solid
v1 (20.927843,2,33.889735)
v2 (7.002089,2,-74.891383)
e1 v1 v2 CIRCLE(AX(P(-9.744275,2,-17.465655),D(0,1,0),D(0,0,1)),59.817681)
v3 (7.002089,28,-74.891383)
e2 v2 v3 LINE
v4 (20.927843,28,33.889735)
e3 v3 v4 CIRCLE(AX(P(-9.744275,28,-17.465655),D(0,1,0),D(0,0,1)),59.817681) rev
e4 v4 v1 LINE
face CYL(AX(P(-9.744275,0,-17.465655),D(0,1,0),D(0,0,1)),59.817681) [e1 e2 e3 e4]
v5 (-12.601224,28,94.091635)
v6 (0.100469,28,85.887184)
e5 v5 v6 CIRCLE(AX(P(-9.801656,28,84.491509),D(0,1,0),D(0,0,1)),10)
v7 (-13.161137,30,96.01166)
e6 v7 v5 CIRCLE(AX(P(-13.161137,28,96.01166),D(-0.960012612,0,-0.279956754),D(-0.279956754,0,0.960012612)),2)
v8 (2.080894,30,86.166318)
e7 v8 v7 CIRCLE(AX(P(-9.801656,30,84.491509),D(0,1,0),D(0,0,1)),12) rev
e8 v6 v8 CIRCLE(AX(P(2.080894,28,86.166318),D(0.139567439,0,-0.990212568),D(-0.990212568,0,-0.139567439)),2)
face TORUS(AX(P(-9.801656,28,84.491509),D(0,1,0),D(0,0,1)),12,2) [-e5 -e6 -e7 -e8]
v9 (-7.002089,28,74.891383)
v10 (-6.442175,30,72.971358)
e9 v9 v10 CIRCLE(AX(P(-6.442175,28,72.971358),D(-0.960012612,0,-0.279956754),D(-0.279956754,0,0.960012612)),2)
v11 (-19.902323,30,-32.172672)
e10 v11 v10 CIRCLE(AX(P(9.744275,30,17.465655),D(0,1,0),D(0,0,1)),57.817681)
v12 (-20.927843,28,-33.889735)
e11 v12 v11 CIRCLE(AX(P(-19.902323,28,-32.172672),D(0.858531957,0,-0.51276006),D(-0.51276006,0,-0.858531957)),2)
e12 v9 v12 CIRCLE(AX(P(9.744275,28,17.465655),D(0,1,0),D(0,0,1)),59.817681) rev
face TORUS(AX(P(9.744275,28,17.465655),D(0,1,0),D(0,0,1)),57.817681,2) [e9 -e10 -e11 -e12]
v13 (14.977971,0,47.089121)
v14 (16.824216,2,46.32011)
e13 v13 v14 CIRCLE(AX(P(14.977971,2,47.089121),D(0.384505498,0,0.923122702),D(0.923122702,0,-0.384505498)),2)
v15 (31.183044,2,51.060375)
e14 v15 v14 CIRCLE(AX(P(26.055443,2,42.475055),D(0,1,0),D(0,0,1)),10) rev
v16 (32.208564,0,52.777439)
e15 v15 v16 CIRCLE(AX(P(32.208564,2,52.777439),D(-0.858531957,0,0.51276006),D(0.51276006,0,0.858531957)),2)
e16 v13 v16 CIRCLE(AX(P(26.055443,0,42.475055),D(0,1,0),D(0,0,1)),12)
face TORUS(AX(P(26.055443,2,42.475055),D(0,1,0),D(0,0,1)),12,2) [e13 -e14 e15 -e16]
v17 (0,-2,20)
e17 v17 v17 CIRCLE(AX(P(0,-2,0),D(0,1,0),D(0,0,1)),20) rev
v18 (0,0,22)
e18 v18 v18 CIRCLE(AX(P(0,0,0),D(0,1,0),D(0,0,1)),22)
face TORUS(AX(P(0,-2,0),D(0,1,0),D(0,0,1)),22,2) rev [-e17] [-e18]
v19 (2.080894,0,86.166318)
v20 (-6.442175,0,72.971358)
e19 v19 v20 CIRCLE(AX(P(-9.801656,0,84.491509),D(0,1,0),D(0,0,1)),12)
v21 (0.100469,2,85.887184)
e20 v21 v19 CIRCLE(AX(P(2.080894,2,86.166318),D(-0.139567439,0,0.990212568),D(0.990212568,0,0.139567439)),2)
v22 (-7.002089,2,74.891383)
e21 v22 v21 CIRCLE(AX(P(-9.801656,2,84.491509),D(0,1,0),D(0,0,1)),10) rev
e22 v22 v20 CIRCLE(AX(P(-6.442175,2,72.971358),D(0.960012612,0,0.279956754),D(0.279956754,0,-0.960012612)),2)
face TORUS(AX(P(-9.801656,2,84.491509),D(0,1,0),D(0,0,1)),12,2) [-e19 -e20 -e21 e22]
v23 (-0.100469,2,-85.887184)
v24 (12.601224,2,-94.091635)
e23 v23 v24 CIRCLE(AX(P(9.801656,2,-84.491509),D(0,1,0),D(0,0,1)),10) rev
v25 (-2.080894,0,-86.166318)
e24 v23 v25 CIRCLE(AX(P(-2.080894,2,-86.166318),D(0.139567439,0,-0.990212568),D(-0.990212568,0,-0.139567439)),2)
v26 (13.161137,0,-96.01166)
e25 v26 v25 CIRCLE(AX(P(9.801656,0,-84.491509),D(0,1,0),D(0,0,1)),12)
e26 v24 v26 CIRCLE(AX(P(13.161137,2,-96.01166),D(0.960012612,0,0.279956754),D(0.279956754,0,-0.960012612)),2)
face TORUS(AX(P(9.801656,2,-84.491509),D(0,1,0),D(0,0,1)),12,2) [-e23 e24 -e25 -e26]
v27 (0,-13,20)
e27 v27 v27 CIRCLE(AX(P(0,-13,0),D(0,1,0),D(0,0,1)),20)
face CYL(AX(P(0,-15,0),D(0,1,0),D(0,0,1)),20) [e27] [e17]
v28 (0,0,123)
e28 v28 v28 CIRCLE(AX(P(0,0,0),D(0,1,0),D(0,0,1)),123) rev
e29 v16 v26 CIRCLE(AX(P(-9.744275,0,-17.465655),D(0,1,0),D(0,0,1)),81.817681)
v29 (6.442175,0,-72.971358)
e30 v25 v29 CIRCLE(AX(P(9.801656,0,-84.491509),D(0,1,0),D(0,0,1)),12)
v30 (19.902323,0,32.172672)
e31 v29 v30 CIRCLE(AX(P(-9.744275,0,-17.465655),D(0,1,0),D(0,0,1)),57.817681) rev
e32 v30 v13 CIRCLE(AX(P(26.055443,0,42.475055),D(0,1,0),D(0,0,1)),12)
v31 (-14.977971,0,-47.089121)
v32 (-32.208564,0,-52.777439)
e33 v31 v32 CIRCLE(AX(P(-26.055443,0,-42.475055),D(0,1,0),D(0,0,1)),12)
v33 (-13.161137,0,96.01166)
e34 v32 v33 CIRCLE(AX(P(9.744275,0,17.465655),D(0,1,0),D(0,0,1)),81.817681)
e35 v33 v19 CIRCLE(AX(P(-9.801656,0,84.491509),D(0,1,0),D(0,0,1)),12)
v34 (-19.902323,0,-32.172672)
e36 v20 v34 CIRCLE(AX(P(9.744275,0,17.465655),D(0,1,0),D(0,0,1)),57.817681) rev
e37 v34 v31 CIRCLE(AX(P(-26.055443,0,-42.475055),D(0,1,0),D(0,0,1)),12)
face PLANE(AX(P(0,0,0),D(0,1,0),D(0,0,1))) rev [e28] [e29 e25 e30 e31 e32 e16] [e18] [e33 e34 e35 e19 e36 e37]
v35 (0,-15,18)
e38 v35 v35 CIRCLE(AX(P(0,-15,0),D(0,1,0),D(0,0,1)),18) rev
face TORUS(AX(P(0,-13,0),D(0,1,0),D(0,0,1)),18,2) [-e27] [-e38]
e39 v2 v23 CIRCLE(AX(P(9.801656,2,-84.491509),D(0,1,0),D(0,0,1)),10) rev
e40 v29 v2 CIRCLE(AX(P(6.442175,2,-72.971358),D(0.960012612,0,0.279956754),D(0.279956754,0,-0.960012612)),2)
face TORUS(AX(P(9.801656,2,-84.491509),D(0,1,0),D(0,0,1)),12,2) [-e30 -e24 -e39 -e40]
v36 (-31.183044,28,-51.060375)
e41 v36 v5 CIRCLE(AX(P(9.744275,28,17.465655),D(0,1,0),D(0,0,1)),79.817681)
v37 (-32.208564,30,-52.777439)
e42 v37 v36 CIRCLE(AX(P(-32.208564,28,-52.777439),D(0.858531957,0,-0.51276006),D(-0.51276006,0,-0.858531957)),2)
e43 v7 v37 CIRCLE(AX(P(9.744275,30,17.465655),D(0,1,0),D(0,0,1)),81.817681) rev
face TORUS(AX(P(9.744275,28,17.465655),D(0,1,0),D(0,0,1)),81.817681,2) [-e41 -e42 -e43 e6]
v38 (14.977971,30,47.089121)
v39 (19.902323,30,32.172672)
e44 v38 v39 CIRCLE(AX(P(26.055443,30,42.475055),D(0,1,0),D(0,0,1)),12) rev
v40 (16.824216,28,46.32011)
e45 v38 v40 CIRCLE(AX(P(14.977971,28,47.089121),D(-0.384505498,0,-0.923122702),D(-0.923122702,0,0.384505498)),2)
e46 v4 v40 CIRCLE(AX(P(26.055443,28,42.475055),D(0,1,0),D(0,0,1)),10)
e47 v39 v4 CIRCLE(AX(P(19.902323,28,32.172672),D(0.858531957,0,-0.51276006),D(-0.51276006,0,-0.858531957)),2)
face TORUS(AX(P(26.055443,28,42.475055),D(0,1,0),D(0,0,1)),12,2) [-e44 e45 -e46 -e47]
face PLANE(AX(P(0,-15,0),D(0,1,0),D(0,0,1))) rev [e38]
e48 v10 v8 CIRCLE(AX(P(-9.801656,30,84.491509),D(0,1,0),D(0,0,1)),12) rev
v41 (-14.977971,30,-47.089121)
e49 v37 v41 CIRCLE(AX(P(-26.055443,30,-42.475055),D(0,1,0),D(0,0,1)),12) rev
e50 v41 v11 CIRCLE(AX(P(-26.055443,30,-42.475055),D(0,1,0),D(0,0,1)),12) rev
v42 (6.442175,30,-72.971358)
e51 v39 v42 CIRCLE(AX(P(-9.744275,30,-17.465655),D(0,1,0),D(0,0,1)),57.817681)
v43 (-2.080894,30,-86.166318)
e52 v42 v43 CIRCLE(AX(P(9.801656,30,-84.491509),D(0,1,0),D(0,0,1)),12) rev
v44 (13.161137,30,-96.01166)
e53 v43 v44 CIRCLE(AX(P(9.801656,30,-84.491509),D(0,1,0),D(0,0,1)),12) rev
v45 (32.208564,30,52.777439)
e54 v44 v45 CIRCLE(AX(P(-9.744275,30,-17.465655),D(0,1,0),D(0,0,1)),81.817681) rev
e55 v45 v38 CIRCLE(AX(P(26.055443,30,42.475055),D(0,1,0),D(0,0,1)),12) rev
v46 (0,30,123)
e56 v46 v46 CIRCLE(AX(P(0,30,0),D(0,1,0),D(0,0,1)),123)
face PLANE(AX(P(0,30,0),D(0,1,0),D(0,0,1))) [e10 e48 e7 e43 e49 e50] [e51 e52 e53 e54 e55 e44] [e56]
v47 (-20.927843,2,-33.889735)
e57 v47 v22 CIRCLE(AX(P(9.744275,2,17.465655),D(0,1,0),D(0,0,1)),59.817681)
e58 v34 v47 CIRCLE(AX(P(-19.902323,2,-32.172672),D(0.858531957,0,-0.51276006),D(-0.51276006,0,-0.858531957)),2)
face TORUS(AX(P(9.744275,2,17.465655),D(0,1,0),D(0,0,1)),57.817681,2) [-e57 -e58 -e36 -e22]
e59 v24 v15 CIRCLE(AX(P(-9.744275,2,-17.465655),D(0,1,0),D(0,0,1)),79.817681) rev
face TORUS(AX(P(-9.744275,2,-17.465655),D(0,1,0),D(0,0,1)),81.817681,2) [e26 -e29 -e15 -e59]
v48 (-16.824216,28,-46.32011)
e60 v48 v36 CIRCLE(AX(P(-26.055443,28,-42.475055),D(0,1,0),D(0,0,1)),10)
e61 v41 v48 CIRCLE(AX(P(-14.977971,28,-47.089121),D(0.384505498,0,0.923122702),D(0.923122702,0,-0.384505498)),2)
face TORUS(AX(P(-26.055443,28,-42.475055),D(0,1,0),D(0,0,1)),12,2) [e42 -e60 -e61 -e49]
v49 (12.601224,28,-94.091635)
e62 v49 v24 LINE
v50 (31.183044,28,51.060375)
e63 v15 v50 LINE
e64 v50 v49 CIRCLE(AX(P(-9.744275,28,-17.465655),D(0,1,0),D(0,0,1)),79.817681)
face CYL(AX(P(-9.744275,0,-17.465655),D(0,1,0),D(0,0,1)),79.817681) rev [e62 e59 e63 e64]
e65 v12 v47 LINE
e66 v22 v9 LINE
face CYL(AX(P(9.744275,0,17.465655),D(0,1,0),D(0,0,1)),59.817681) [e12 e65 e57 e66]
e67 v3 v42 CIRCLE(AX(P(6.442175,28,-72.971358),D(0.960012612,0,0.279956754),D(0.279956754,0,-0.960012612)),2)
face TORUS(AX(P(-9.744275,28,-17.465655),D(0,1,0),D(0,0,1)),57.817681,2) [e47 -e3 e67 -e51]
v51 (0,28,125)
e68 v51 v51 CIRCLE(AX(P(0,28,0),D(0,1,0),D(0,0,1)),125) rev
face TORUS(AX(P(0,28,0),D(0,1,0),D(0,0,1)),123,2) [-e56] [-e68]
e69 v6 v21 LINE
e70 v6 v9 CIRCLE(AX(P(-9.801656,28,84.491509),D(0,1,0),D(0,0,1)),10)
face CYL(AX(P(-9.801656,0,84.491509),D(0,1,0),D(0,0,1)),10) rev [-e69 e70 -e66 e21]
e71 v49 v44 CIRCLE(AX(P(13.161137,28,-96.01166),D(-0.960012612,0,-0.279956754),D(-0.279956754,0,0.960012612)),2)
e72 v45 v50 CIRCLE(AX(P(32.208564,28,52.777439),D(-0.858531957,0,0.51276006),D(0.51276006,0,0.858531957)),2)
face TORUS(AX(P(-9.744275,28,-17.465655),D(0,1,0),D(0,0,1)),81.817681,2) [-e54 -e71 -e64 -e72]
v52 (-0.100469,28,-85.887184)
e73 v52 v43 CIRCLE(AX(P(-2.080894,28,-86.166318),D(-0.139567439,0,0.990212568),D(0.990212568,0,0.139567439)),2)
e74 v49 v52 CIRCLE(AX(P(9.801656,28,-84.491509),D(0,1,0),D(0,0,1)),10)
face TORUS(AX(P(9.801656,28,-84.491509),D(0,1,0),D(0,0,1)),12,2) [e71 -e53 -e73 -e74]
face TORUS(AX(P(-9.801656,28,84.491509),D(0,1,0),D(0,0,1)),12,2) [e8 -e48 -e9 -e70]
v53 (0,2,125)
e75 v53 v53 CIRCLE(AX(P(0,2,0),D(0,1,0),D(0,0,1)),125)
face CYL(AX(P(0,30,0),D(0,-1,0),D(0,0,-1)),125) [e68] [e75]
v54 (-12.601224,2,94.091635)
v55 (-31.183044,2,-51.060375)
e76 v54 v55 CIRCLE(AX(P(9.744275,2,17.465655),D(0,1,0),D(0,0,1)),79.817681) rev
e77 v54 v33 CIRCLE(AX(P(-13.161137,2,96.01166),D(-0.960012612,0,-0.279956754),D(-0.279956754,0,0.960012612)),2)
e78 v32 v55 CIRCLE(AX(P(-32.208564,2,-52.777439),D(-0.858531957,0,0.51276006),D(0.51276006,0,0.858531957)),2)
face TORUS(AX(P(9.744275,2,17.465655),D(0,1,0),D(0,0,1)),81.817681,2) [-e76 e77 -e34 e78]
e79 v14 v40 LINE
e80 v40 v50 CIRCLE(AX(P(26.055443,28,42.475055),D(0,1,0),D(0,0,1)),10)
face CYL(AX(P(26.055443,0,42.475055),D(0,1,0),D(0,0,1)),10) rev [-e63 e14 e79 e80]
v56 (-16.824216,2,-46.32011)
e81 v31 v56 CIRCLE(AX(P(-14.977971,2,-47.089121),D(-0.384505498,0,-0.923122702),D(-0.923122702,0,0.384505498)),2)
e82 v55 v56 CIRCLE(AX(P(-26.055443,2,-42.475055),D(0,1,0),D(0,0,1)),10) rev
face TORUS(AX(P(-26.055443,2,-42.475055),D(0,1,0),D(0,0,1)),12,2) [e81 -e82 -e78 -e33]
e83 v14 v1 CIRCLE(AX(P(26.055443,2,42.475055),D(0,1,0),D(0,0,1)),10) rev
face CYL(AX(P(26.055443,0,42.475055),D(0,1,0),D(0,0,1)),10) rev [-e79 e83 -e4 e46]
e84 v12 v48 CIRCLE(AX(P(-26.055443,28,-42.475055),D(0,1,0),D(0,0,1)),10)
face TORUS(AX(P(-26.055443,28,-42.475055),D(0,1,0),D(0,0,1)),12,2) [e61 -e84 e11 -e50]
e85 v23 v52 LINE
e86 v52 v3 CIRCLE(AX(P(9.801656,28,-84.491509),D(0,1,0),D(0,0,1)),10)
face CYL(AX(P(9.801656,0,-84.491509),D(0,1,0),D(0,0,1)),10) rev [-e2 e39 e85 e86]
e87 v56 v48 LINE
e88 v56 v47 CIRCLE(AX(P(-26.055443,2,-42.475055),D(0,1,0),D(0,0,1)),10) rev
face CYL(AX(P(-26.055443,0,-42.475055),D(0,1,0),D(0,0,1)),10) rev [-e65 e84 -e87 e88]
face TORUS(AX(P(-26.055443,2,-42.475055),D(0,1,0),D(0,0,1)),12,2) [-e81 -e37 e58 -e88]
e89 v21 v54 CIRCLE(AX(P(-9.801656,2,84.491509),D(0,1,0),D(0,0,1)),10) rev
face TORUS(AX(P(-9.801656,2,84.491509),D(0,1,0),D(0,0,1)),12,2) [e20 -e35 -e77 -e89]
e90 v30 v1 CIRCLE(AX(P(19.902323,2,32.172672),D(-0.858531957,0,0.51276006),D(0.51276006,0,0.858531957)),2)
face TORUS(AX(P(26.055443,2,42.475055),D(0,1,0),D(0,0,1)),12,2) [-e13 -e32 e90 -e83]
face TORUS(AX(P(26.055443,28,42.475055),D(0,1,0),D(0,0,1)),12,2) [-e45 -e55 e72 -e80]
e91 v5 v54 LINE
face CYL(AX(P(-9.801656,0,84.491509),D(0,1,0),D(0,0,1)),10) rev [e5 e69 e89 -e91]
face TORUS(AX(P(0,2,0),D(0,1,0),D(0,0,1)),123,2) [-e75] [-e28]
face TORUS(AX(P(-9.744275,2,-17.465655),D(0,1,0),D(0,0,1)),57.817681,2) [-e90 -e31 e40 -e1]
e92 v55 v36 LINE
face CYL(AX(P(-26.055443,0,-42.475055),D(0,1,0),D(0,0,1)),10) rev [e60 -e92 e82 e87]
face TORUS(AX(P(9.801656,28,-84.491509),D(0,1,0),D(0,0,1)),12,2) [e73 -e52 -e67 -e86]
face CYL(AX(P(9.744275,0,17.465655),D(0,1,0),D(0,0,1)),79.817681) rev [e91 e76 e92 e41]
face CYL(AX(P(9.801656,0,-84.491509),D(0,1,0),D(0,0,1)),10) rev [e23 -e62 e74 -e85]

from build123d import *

# Parameters (mm, degrees)
SKETCH_1_R          = 125
SKETCH_1_R_2        = 20
EXTRUDE_1_DEPTH     = 30
CUT_EXTRUDE_1_DEPTH = 30
FILLET_3_R          = 10
SKETCH_1_3_R        = 20
EXTRUDE_2_DEPTH     = 30
FILLET_4_R          = 2
SKETCH_1_4_R        = 20
EXTRUDE_3_DEPTH     = 15
FILLET_5_R          = 2


with BuildPart() as part:
    # 草图1 → 凸台-拉伸1 (new body)
    with BuildSketch(Plane(origin=(0, 0, 0), x_dir=(1, 0, 0), z_dir=(0, 1, 0))):
        with Locations(Location((0, 0, 0), (0, 0, 270))):
            Circle(SKETCH_1_R)
        with Locations(Location((0, 0, 0), (0, 0, 270))):
            Circle(SKETCH_1_R_2, mode=Mode.SUBTRACT)
    extrude(amount=EXTRUDE_1_DEPTH)

    # 草图2 → 切除-拉伸1 (cut)
    with BuildSketch(Plane(origin=(0, 30, 0), x_dir=(1, 0, 0), z_dir=(0, 1, 0))):
        with BuildLine():
            Line((1.395674395, 96.50212568), (-1.395674395, 76.69787432))
            ThreePointArc((-1.395674395, 76.69787432), (49.589198145, 25.061305382), (13.255952188, -37.753404024))
            Line((13.255952188, -37.753404024), (20.946062145, -56.215858055))
            ThreePointArc((20.946062145, -56.215858055), (69.427303642, 27.600905796), (1.395674395, 96.50212568))
        make_face()
        with BuildLine():
            Line((-13.255952188, 37.753404024), (-20.946062145, 56.215858055))
            ThreePointArc((-20.946062145, 56.215858055), (-69.427303642, -27.600905796), (-1.395674395, -96.50212568))
            Line((-1.395674395, -96.50212568), (1.395674395, -76.69787432))
            ThreePointArc((1.395674395, -76.69787432), (-49.589198145, -25.061305382), (-13.255952188, 37.753404024))
        make_face()
    extrude(amount=-CUT_EXTRUDE_1_DEPTH, mode=Mode.SUBTRACT)

    # 圆角3
    fillet_3_edges = [part.edges().sort_by_distance(p)[0] for p in [
        (-20.946062145, 15, -56.215858055),
        (-13.255952188, 15, -37.753404024),
        (-1.395674395, 15, 96.50212568),
        (1.395674395, 15, 76.69787432),
        (20.946062145, 15, 56.215858055),
        (13.255952188, 15, 37.753404024),
        (-1.395674395, 15, -76.69787432),
        (1.395674395, 15, -96.50212568),
    ]]
    fillet(fillet_3_edges, radius=FILLET_3_R - 0.0001)  # a hair under: the kernel refuses the full size

    # 草图1<3> → 凸台-拉伸2 (add)
    with BuildSketch(Plane(origin=(0, 0, 0), x_dir=(1, 0, 0), z_dir=(0, 1, 0))):
        Circle(SKETCH_1_3_R)
    extrude(amount=EXTRUDE_2_DEPTH)

    # 圆角4
    fillet_4_edges = [part.edges().sort_by_distance(p)[0] for p in [
        (0, 0, -125),
        (-69.427303642, 30, 27.600905796),
        (-69.427303642, 0, 27.600905796),
        (-49.589198145, 30, 25.061305382),
        (-49.589198145, 0, 25.061305382),
        (69.427303642, 30, -27.600905796),
        (69.427303642, 0, -27.600905796),
        (49.589198145, 30, -25.061305382),
        (49.589198145, 0, -25.061305382),
        (0, 30, -125),
        (-22.920540142, 30, -51.971024611),
        (-22.920540142, 0, -51.971024611),
        (-16.559492515, 30, -39.340160323),
        (-16.559492515, 0, -39.340160323),
        (-4.375771536, 30, 92.891558501),
        (-4.375771536, 0, 92.891558501),
        (-1.401623113, 30, 79.065637167),
        (-1.401623113, 0, 79.065637167),
        (22.920540142, 30, 51.971024611),
        (22.920540142, 0, 51.971024611),
        (16.559492515, 30, 39.340160323),
        (16.559492515, 0, 39.340160323),
        (1.401623113, 30, -79.065637167),
        (1.401623113, 0, -79.065637167),
        (4.375771536, 30, -92.891558501),
        (4.375771536, 0, -92.891558501),
    ]]
    fillet(fillet_4_edges, radius=FILLET_4_R)

    # 草图1<4> → 凸台-拉伸3 (add)
    with BuildSketch(Plane(origin=(0, 0, 0), x_dir=(1, 0, 0), z_dir=(0, 1, 0))):
        with Locations(Location((0, 0, 0), (0, 0, 270))):
            Circle(SKETCH_1_4_R)
    extrude(amount=-EXTRUDE_3_DEPTH)

    # 圆角5
    fillet_5_edges = [part.edges().sort_by_distance(p)[0] for p in [
        (0, -15, -20),
        (0, 0, -20),
    ]]
    fillet(fillet_5_edges, radius=FILLET_5_R)


solid = part.part
